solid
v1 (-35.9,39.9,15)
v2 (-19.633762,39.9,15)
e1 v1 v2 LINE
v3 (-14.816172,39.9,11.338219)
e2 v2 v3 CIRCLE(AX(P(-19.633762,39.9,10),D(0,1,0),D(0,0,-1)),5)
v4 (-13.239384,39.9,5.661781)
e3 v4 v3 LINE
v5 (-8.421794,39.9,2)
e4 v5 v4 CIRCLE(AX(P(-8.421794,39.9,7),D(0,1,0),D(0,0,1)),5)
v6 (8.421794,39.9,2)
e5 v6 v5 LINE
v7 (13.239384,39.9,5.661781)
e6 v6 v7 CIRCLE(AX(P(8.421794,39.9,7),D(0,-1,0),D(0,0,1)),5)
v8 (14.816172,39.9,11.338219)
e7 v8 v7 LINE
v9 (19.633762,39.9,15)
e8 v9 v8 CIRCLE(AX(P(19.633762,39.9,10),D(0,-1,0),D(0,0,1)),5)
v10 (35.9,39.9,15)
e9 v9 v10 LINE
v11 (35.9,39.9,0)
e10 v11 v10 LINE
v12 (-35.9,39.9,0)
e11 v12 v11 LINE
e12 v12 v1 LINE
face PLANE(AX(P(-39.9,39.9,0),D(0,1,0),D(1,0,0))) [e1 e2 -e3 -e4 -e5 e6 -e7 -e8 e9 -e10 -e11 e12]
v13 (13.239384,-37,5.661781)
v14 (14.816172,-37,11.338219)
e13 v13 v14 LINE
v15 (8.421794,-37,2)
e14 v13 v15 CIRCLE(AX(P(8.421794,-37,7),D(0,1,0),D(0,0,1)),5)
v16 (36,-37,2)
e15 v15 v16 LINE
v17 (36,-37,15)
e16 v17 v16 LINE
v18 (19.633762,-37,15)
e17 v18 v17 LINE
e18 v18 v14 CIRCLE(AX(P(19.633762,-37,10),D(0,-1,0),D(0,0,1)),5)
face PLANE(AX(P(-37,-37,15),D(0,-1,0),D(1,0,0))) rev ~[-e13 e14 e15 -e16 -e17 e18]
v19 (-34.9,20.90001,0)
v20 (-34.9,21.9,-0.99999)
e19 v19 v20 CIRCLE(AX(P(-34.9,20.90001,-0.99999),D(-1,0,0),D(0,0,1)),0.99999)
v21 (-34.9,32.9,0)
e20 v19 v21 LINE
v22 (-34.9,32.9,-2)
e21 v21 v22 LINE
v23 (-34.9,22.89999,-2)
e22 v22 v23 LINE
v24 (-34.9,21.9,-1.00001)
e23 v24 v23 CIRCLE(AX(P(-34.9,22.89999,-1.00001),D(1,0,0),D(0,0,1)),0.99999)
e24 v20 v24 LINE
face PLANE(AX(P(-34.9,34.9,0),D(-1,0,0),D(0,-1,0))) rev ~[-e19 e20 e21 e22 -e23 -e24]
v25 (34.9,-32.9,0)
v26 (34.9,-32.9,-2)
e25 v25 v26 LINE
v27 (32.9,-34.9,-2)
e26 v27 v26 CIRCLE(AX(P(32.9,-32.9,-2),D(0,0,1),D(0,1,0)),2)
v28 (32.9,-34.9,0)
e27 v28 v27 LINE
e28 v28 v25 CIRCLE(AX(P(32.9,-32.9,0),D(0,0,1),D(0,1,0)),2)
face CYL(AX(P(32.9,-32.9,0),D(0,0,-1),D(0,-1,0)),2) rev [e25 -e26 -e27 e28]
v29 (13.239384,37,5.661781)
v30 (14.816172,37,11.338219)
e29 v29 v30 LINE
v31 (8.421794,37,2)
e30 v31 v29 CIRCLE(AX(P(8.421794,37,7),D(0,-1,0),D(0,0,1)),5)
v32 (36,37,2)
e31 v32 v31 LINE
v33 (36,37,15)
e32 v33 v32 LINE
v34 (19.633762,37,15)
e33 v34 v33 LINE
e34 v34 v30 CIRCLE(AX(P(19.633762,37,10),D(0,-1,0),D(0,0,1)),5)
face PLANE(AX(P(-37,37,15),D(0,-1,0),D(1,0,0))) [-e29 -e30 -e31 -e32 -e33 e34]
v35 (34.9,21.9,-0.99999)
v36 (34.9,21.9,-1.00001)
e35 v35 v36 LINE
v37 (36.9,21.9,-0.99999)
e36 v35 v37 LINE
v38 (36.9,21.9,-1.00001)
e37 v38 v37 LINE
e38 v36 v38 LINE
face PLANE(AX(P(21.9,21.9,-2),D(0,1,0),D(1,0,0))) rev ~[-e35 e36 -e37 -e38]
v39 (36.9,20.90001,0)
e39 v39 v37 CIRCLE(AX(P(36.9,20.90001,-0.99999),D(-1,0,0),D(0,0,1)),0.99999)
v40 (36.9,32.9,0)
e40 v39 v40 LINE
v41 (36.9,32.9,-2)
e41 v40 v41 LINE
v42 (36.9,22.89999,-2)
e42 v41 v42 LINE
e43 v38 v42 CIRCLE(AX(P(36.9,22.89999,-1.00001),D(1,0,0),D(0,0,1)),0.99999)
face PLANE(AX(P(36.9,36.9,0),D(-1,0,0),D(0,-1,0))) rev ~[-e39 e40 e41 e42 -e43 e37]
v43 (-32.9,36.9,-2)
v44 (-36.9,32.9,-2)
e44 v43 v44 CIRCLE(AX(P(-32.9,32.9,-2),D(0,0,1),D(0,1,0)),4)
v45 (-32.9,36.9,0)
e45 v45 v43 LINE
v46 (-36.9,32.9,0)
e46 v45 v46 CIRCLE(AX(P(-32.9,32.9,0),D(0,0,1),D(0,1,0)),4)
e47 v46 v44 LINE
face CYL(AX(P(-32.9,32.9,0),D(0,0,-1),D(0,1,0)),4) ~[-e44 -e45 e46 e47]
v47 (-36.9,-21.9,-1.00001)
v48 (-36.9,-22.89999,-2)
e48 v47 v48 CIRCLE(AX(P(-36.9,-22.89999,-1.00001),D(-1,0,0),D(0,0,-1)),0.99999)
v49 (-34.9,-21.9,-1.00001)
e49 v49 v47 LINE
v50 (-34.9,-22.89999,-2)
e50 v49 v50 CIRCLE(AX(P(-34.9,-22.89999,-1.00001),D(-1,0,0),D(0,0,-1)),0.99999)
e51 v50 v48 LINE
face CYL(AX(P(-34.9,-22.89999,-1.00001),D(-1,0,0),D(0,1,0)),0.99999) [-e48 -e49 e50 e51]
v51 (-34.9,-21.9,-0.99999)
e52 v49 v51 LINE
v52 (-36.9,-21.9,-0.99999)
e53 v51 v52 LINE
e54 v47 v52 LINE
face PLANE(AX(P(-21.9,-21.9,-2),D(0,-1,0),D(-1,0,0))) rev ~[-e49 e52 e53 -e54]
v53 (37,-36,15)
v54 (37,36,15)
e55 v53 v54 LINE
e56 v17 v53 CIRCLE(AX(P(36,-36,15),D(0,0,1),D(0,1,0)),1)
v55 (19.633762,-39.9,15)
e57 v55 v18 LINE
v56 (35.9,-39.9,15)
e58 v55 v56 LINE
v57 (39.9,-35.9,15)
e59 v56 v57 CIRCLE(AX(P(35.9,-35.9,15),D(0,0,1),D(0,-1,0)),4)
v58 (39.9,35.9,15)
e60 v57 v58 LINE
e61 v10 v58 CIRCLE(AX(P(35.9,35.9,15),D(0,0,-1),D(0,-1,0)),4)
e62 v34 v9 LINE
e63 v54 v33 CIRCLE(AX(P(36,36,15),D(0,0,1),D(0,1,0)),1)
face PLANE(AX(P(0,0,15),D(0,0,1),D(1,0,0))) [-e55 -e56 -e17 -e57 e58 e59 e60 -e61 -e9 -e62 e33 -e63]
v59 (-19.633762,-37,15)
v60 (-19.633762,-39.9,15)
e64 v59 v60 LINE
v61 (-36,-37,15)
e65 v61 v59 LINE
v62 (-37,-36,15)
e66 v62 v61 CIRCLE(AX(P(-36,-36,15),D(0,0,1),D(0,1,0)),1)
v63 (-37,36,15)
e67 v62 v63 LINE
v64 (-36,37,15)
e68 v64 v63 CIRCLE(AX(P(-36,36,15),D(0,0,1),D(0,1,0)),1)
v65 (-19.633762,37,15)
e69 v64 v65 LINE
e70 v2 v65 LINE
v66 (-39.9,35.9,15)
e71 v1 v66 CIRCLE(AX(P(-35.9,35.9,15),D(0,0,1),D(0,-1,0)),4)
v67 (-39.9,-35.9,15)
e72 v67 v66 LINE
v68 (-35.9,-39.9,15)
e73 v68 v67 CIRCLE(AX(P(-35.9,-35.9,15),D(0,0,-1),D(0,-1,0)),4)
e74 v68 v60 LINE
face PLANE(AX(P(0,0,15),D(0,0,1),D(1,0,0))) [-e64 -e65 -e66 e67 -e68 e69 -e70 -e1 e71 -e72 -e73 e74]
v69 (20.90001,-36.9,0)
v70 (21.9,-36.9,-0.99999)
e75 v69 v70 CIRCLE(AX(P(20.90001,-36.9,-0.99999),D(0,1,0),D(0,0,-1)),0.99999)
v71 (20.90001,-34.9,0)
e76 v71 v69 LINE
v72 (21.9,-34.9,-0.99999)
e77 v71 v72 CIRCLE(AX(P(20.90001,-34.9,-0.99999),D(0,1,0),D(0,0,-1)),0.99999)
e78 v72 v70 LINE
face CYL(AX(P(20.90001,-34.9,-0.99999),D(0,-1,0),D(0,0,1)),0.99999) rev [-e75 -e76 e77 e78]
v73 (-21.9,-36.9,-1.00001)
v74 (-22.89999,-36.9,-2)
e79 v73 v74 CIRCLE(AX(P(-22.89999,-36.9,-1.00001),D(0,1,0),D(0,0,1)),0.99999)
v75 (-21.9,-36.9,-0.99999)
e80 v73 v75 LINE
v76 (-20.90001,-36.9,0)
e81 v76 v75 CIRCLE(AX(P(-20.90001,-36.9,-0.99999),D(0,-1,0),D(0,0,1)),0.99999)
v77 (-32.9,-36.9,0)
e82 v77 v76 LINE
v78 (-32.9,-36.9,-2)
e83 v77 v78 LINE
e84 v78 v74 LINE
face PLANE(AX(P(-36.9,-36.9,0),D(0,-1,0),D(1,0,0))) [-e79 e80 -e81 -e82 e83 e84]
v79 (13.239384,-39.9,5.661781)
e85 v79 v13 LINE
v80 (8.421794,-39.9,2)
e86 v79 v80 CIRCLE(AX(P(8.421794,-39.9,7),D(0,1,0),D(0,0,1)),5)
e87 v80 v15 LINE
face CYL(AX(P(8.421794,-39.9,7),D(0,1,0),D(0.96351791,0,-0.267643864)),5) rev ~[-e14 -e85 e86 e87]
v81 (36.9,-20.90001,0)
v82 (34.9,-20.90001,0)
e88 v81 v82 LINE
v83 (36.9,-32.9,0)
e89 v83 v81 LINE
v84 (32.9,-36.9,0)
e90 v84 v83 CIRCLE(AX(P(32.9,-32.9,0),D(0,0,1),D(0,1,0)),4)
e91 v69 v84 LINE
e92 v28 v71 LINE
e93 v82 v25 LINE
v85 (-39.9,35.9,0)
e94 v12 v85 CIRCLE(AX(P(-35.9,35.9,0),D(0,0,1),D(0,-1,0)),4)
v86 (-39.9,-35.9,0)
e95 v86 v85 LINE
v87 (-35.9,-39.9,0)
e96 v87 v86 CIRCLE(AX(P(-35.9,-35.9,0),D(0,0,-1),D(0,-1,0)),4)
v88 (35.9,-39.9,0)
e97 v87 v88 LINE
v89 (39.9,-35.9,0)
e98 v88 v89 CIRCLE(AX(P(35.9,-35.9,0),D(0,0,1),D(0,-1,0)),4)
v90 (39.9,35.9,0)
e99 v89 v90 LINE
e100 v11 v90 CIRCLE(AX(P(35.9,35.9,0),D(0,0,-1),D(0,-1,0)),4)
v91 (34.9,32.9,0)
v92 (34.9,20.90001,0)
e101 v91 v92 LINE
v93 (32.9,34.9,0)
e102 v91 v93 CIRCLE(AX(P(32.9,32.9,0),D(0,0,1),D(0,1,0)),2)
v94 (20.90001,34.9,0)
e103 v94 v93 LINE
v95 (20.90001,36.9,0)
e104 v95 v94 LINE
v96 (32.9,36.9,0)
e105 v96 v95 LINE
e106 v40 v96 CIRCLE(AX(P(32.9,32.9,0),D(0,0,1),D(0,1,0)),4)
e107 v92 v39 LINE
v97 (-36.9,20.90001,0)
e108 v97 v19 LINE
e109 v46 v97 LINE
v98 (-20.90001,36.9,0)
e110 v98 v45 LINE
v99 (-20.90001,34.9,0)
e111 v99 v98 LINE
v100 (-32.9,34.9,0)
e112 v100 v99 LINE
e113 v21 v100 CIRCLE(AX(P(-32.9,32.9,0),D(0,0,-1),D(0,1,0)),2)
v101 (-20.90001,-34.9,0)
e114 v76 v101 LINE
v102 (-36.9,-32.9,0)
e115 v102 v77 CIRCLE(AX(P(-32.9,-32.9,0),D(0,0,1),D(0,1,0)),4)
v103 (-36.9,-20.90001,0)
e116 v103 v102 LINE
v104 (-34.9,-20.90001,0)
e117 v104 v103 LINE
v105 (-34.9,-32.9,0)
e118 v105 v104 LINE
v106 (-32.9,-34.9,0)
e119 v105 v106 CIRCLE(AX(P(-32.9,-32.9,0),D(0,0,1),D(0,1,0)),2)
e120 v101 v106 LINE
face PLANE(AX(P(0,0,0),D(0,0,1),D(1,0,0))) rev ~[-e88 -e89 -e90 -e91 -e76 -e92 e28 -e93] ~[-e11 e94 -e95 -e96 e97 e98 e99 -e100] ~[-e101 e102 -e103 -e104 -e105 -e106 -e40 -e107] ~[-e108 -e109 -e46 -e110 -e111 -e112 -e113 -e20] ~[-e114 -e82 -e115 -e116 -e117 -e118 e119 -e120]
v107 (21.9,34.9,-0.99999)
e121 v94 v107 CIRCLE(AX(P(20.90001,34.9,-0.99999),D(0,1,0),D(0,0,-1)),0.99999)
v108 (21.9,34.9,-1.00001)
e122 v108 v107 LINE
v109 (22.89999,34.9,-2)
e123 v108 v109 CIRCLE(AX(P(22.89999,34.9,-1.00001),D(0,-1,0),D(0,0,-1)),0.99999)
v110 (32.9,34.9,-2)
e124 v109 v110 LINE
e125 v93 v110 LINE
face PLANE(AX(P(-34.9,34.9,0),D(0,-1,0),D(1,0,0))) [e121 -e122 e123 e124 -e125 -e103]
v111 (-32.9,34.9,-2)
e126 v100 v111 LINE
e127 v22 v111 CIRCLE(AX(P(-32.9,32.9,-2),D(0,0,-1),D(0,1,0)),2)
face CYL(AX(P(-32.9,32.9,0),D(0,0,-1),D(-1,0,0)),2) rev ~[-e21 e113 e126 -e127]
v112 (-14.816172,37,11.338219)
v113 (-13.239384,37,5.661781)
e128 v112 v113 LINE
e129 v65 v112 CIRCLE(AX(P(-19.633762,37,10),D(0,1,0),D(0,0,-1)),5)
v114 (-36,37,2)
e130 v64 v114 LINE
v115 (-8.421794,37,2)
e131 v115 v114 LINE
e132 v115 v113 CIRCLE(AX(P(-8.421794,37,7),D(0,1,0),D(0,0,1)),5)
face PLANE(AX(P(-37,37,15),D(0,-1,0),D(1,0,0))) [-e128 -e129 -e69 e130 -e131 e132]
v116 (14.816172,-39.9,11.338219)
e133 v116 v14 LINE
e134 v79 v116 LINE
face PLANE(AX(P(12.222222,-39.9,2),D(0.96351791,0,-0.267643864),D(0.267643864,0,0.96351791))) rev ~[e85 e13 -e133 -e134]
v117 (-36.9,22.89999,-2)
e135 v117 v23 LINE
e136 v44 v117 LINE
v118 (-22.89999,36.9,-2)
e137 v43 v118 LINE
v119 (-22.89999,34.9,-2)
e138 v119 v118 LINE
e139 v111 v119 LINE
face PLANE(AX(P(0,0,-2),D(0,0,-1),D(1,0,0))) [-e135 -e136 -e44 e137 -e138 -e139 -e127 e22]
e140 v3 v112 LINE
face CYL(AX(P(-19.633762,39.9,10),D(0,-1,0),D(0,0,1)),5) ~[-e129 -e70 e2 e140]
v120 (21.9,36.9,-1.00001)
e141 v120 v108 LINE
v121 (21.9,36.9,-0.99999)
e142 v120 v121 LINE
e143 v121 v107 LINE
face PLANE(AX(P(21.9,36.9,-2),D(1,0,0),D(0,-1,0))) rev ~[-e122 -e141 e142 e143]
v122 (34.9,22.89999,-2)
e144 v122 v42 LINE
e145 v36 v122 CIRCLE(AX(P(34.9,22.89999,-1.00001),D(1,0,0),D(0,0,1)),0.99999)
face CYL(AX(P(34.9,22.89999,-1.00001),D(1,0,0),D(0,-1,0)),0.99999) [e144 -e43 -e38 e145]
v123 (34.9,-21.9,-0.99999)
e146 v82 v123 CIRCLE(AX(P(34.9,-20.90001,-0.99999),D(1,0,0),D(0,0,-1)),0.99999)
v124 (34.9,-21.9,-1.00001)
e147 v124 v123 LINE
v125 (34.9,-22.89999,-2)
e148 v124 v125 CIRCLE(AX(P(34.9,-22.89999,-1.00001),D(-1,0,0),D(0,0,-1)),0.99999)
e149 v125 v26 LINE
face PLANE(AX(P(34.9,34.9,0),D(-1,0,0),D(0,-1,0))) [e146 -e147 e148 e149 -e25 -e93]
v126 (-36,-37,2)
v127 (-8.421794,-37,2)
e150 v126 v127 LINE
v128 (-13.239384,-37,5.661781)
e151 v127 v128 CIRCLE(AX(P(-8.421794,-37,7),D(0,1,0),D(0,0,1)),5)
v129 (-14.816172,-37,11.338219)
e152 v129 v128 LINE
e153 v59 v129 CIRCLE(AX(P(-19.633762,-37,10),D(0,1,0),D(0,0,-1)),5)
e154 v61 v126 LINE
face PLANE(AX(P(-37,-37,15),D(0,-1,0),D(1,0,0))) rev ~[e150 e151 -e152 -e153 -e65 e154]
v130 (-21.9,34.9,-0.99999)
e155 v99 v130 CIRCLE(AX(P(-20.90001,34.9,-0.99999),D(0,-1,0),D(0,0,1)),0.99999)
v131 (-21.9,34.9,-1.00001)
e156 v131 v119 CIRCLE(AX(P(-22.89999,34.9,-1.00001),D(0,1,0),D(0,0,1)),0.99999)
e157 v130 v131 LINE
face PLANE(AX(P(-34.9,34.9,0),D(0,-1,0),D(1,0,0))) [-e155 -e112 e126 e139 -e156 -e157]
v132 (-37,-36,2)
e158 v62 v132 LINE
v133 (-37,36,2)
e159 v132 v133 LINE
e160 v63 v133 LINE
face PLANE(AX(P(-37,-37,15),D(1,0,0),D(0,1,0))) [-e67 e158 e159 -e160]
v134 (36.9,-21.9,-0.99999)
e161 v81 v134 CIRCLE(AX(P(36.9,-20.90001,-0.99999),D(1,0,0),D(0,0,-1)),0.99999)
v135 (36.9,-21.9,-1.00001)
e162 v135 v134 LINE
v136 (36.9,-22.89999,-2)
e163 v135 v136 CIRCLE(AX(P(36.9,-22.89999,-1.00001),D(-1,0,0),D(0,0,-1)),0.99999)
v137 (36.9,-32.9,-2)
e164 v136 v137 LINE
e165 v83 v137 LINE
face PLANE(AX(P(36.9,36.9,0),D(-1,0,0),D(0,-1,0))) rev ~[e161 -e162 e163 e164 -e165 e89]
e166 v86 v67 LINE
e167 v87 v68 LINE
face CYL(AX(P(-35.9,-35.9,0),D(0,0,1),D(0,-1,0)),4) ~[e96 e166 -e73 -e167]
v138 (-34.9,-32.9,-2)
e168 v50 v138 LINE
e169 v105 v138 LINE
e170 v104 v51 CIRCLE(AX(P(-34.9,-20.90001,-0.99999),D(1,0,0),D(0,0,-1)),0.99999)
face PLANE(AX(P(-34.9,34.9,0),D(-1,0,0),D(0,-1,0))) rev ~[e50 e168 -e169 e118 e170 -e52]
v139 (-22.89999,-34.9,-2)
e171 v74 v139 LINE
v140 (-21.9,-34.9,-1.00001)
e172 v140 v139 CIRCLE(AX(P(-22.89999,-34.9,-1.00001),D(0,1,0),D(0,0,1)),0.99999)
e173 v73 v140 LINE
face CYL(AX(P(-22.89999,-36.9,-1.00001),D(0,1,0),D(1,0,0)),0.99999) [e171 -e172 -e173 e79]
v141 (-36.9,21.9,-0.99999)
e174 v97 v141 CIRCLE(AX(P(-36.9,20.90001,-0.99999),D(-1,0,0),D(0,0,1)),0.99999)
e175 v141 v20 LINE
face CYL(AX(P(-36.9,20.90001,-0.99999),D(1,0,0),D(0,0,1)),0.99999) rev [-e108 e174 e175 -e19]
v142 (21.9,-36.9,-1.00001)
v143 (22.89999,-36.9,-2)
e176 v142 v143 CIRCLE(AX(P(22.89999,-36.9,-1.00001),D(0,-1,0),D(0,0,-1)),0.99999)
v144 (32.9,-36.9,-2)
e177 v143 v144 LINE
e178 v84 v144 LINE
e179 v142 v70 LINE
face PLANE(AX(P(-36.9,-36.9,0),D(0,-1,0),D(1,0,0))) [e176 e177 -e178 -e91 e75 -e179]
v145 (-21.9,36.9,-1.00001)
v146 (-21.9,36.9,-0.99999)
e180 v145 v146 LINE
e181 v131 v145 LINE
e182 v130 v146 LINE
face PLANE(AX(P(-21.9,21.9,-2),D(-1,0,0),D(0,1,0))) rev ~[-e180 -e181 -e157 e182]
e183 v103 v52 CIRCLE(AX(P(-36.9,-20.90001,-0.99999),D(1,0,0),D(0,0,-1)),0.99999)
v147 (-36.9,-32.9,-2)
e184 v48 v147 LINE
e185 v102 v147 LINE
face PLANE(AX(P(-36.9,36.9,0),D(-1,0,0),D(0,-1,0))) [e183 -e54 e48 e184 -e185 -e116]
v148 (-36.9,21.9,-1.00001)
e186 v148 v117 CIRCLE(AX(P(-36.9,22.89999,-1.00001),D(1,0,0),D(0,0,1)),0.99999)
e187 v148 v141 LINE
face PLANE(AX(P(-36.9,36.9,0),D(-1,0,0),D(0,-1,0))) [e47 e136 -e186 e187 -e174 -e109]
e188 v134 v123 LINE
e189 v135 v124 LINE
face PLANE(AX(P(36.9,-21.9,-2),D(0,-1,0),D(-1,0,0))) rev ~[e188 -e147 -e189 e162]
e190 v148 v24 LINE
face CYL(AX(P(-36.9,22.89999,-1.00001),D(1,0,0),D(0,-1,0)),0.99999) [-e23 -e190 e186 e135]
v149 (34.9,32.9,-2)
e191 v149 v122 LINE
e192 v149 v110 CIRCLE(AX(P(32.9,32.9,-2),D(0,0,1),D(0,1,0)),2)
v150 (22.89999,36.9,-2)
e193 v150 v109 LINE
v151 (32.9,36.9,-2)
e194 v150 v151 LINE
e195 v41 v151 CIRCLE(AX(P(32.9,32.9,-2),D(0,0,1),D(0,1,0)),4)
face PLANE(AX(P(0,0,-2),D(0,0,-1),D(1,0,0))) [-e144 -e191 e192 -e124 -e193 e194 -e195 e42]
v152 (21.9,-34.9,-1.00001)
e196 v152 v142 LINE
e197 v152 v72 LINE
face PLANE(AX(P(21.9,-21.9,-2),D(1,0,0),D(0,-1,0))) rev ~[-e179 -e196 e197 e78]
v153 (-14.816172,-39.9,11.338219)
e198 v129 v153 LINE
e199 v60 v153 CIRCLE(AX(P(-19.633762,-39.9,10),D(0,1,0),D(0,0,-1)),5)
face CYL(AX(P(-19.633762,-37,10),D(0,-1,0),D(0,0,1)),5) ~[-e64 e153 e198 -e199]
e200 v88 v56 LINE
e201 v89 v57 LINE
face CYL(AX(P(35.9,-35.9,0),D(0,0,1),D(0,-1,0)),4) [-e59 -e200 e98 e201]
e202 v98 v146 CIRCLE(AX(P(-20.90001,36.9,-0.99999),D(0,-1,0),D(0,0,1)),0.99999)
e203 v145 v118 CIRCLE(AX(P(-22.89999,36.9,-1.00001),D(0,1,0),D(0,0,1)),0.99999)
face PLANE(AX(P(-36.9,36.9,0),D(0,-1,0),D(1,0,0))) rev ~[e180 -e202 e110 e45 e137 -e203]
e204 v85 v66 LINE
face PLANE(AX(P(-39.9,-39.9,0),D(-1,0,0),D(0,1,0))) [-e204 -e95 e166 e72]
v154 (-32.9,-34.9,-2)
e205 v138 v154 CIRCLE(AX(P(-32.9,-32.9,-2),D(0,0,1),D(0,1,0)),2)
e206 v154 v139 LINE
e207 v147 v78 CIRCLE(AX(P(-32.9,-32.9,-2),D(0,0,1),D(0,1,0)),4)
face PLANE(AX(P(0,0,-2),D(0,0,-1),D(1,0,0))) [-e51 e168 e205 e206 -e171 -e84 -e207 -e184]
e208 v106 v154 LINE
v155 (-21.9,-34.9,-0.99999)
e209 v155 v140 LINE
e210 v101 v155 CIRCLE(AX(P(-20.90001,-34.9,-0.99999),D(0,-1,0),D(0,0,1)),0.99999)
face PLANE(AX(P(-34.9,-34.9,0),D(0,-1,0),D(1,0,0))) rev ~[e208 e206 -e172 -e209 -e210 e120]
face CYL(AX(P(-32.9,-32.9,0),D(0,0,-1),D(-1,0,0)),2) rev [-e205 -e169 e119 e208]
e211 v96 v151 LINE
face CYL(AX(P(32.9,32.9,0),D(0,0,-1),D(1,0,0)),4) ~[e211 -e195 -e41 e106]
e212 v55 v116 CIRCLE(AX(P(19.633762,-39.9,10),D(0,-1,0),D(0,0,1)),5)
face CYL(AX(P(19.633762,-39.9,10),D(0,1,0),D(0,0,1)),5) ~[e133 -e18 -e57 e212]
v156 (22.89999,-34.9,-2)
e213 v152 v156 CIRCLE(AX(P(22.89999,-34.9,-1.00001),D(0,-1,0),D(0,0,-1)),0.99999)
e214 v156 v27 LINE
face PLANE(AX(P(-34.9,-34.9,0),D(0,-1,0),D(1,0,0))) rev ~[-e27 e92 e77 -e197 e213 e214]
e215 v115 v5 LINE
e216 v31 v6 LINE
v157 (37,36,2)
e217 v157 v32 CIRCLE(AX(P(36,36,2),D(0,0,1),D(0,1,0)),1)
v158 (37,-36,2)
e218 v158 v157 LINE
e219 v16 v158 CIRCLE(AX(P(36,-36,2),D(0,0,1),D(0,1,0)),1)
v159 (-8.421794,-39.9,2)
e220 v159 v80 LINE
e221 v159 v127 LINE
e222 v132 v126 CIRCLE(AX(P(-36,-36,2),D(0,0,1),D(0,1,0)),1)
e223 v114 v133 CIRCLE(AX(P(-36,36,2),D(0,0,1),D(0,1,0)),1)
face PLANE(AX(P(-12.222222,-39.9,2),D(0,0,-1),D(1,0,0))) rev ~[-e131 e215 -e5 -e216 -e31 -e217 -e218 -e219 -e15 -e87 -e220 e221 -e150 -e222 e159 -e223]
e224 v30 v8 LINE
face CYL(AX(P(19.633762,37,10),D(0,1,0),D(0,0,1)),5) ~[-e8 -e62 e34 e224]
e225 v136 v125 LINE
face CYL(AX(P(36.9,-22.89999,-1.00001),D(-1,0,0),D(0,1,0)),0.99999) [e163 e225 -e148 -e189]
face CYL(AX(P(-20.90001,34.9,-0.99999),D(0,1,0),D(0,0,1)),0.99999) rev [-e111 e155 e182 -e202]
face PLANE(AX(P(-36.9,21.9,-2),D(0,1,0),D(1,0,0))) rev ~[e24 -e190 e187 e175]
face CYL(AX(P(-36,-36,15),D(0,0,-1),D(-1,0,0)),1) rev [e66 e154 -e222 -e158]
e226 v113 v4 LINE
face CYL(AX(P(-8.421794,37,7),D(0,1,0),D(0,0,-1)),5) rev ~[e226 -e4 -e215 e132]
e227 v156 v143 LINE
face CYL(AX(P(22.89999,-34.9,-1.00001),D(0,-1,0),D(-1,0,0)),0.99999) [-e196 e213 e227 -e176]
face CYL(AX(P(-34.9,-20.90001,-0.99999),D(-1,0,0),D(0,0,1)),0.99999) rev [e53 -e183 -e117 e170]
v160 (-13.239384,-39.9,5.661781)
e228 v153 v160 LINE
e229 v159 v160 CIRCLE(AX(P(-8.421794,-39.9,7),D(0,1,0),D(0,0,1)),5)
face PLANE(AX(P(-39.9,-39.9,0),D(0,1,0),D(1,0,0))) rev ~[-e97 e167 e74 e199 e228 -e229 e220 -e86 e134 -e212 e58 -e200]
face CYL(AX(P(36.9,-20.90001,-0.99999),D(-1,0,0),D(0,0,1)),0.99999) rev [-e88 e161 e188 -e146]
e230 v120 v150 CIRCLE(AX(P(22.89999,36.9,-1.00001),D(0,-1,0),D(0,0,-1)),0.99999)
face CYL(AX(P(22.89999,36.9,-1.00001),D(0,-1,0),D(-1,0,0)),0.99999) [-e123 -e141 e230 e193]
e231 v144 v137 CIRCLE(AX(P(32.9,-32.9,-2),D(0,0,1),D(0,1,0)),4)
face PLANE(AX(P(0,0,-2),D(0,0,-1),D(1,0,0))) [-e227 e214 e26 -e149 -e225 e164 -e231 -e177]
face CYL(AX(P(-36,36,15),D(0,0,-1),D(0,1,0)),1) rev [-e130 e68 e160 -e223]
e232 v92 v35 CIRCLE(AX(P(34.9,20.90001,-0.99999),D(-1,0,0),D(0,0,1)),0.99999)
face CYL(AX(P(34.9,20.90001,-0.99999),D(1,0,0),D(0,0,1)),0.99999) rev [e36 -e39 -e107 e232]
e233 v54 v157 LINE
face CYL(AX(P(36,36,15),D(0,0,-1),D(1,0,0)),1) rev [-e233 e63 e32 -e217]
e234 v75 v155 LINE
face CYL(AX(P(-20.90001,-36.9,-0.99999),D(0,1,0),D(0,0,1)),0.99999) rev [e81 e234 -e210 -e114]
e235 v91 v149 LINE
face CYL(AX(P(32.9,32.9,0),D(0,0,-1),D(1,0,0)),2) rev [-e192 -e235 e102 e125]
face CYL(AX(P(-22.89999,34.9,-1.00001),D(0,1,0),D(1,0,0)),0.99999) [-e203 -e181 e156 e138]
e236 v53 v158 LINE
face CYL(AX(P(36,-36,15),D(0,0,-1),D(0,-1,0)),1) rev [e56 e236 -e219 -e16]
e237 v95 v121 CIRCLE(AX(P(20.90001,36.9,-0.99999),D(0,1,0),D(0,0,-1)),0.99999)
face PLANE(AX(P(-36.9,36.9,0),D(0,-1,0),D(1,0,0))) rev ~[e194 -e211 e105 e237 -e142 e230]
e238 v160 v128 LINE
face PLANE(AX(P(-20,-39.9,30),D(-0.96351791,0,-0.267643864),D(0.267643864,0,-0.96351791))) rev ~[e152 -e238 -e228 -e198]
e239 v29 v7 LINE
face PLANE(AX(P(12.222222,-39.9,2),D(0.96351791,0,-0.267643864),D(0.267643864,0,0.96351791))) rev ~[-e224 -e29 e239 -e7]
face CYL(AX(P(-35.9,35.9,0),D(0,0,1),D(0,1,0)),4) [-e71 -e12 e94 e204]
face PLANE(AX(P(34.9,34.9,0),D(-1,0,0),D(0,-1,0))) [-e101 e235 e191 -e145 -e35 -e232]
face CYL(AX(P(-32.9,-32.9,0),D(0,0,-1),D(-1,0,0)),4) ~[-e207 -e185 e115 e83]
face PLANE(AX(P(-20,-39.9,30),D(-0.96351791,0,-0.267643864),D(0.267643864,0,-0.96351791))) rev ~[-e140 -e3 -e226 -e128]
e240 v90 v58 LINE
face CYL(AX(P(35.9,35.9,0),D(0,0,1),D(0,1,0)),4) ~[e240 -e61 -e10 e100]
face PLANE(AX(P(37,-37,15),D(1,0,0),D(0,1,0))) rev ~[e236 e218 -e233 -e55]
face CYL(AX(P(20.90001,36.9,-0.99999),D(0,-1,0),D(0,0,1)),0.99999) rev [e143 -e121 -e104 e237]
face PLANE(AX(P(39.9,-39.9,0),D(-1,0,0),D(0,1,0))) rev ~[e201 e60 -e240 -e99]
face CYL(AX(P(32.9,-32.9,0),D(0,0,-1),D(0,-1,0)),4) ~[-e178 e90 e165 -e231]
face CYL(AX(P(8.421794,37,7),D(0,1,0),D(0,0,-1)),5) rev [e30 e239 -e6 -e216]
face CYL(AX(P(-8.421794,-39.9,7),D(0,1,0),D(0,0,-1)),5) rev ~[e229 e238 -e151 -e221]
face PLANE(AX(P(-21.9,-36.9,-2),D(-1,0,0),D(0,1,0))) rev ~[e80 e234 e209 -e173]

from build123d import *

# Parameters (mm, degrees)
F0_W      = 79.8
F0_H      = 79.8
F1_DEPTH  = 15
F2_W      = 74
F2_H      = 74
F3_DEPTH  = 13
F4_W      = 73.8
F4_H      = 73.8
F4_W_2    = 69.8
F4_H_2    = 69.8
F5_DEPTH  = 2
F7_DEPTH  = 2
F8_R      = 2
F9_R      = 4
F10_R     = 0.99999
F12_DEPTH = 79.801
F13_R     = 5
F14_R     = 4
F15_R     = 1


# Not quite as in the source:
# - a fillet or chamfer is up to 0.001 mm smaller than in the source, because OpenCascade refuses the exact size


with BuildPart() as f1:
    # F0 (on Top) → F1 (new body)
    with BuildSketch(Plane.XY):
        Rectangle(F0_W, F0_H)
    extrude(amount=F1_DEPTH)

    # F2 (on face) → F3 (cut)
    with BuildSketch(Plane.XY.offset(15)):
        Rectangle(F2_W, F2_H)
    extrude(amount=-F3_DEPTH, mode=Mode.SUBTRACT)

    # F4 (on face) → F5 (join)
    with BuildSketch(Plane(origin=(0, 0, 0), x_dir=(1, 0, 0), z_dir=(0, 0, -1))):
        Rectangle(F4_W, F4_H)
        Rectangle(F4_W_2, F4_H_2, mode=Mode.SUBTRACT)
    extrude(amount=F5_DEPTH)

    # F6 (on face) → F7 (cut, through all)
    with BuildSketch(Plane(origin=(0, 0, -2), x_dir=(1, 0, 0), z_dir=(0, 0, -1))):
        Polygon((36.9, -21.9), (36.9, 21.9), (21.9, 21.9), (21.9, 36.9), (-21.9, 36.9), (-21.9, 21.9), (-36.9, 21.9), (-36.9, -21.9), (-21.9, -21.9), (-21.9, -36.9), (21.9, -36.9), (21.9, -21.9), align=None)
    extrude(amount=-F7_DEPTH, mode=Mode.SUBTRACT)

    # F8
    f8_edges = [f1.edges().sort_by_distance(p)[0] for p in [
        (-34.9, 34.9, -1),
        (-34.9, -34.9, -1),
        (34.9, -34.9, -1),
        (34.9, 34.9, -1),
    ]]
    fillet(f8_edges, radius=F8_R)

    # F9
    f9_edges = [f1.edges().sort_by_distance(p)[0] for p in [
        (-36.9, 36.9, -1),
        (36.9, 36.9, -1),
        (36.9, -36.9, -1),
        (-36.9, -36.9, -1),
    ]]
    fillet(f9_edges, radius=F9_R)

    # F10 (radius 1 in the source; OpenCascade refuses exactly that, so slightly less here)
    f10_edges = [f1.edges().sort_by_distance(p)[0] for p in [
        (21.9, -35.9, -2),
        (21.9, -35.9, 0),
        (35.9, -21.9, -2),
        (35.9, -21.9, 0),
        (-35.9, -21.9, -2),
        (-35.9, -21.9, 0),
        (-21.9, -35.9, -2),
        (-21.9, -35.9, 0),
        (-35.9, 21.9, -2),
        (-35.9, 21.9, 0),
        (-21.9, 35.9, -2),
        (-21.9, 35.9, 0),
        (21.9, 35.9, -2),
        (21.9, 35.9, 0),
        (35.9, 21.9, -2),
        (35.9, 21.9, 0),
    ]]
    fillet(f10_edges, radius=F10_R)

    # F11 (on face) → F12 (cut, through all)
    with BuildSketch(Plane.XZ.offset(39.9)):
        Polygon((20, 30), (-20, 30), (-12.2222222222, 2), (12.2222222222, 2), align=None)
    extrude(amount=-F12_DEPTH, mode=Mode.SUBTRACT)

    # F13
    f13_edges = [f1.edges().sort_by_distance(p)[0] for p in [
        (-15.833333, 38.45, 15),
        (-15.833333, -38.45, 15),
        (15.833333, -38.45, 15),
        (15.833333, 38.45, 15),
        (-12.222222, 38.45, 2),
        (-12.222222, -38.45, 2),
        (12.222222, -38.45, 2),
        (12.222222, 38.45, 2),
    ]]
    fillet(f13_edges, radius=F13_R)

    # F14
    f14_edges = [f1.edges().sort_by_distance(p)[0] for p in [
        (39.9, -39.9, 7.5),
        (39.9, 39.9, 7.5),
        (-39.9, -39.9, 7.5),
        (-39.9, 39.9, 7.5),
    ]]
    fillet(f14_edges, radius=F14_R)

    # F15
    f15_edges = [f1.edges().sort_by_distance(p)[0] for p in [
        (37, 37, 8.5),
        (-37, 37, 8.5),
        (-37, -37, 8.5),
        (37, -37, 8.5),
    ]]
    fillet(f15_edges, radius=F15_R)


solid = f1.part
